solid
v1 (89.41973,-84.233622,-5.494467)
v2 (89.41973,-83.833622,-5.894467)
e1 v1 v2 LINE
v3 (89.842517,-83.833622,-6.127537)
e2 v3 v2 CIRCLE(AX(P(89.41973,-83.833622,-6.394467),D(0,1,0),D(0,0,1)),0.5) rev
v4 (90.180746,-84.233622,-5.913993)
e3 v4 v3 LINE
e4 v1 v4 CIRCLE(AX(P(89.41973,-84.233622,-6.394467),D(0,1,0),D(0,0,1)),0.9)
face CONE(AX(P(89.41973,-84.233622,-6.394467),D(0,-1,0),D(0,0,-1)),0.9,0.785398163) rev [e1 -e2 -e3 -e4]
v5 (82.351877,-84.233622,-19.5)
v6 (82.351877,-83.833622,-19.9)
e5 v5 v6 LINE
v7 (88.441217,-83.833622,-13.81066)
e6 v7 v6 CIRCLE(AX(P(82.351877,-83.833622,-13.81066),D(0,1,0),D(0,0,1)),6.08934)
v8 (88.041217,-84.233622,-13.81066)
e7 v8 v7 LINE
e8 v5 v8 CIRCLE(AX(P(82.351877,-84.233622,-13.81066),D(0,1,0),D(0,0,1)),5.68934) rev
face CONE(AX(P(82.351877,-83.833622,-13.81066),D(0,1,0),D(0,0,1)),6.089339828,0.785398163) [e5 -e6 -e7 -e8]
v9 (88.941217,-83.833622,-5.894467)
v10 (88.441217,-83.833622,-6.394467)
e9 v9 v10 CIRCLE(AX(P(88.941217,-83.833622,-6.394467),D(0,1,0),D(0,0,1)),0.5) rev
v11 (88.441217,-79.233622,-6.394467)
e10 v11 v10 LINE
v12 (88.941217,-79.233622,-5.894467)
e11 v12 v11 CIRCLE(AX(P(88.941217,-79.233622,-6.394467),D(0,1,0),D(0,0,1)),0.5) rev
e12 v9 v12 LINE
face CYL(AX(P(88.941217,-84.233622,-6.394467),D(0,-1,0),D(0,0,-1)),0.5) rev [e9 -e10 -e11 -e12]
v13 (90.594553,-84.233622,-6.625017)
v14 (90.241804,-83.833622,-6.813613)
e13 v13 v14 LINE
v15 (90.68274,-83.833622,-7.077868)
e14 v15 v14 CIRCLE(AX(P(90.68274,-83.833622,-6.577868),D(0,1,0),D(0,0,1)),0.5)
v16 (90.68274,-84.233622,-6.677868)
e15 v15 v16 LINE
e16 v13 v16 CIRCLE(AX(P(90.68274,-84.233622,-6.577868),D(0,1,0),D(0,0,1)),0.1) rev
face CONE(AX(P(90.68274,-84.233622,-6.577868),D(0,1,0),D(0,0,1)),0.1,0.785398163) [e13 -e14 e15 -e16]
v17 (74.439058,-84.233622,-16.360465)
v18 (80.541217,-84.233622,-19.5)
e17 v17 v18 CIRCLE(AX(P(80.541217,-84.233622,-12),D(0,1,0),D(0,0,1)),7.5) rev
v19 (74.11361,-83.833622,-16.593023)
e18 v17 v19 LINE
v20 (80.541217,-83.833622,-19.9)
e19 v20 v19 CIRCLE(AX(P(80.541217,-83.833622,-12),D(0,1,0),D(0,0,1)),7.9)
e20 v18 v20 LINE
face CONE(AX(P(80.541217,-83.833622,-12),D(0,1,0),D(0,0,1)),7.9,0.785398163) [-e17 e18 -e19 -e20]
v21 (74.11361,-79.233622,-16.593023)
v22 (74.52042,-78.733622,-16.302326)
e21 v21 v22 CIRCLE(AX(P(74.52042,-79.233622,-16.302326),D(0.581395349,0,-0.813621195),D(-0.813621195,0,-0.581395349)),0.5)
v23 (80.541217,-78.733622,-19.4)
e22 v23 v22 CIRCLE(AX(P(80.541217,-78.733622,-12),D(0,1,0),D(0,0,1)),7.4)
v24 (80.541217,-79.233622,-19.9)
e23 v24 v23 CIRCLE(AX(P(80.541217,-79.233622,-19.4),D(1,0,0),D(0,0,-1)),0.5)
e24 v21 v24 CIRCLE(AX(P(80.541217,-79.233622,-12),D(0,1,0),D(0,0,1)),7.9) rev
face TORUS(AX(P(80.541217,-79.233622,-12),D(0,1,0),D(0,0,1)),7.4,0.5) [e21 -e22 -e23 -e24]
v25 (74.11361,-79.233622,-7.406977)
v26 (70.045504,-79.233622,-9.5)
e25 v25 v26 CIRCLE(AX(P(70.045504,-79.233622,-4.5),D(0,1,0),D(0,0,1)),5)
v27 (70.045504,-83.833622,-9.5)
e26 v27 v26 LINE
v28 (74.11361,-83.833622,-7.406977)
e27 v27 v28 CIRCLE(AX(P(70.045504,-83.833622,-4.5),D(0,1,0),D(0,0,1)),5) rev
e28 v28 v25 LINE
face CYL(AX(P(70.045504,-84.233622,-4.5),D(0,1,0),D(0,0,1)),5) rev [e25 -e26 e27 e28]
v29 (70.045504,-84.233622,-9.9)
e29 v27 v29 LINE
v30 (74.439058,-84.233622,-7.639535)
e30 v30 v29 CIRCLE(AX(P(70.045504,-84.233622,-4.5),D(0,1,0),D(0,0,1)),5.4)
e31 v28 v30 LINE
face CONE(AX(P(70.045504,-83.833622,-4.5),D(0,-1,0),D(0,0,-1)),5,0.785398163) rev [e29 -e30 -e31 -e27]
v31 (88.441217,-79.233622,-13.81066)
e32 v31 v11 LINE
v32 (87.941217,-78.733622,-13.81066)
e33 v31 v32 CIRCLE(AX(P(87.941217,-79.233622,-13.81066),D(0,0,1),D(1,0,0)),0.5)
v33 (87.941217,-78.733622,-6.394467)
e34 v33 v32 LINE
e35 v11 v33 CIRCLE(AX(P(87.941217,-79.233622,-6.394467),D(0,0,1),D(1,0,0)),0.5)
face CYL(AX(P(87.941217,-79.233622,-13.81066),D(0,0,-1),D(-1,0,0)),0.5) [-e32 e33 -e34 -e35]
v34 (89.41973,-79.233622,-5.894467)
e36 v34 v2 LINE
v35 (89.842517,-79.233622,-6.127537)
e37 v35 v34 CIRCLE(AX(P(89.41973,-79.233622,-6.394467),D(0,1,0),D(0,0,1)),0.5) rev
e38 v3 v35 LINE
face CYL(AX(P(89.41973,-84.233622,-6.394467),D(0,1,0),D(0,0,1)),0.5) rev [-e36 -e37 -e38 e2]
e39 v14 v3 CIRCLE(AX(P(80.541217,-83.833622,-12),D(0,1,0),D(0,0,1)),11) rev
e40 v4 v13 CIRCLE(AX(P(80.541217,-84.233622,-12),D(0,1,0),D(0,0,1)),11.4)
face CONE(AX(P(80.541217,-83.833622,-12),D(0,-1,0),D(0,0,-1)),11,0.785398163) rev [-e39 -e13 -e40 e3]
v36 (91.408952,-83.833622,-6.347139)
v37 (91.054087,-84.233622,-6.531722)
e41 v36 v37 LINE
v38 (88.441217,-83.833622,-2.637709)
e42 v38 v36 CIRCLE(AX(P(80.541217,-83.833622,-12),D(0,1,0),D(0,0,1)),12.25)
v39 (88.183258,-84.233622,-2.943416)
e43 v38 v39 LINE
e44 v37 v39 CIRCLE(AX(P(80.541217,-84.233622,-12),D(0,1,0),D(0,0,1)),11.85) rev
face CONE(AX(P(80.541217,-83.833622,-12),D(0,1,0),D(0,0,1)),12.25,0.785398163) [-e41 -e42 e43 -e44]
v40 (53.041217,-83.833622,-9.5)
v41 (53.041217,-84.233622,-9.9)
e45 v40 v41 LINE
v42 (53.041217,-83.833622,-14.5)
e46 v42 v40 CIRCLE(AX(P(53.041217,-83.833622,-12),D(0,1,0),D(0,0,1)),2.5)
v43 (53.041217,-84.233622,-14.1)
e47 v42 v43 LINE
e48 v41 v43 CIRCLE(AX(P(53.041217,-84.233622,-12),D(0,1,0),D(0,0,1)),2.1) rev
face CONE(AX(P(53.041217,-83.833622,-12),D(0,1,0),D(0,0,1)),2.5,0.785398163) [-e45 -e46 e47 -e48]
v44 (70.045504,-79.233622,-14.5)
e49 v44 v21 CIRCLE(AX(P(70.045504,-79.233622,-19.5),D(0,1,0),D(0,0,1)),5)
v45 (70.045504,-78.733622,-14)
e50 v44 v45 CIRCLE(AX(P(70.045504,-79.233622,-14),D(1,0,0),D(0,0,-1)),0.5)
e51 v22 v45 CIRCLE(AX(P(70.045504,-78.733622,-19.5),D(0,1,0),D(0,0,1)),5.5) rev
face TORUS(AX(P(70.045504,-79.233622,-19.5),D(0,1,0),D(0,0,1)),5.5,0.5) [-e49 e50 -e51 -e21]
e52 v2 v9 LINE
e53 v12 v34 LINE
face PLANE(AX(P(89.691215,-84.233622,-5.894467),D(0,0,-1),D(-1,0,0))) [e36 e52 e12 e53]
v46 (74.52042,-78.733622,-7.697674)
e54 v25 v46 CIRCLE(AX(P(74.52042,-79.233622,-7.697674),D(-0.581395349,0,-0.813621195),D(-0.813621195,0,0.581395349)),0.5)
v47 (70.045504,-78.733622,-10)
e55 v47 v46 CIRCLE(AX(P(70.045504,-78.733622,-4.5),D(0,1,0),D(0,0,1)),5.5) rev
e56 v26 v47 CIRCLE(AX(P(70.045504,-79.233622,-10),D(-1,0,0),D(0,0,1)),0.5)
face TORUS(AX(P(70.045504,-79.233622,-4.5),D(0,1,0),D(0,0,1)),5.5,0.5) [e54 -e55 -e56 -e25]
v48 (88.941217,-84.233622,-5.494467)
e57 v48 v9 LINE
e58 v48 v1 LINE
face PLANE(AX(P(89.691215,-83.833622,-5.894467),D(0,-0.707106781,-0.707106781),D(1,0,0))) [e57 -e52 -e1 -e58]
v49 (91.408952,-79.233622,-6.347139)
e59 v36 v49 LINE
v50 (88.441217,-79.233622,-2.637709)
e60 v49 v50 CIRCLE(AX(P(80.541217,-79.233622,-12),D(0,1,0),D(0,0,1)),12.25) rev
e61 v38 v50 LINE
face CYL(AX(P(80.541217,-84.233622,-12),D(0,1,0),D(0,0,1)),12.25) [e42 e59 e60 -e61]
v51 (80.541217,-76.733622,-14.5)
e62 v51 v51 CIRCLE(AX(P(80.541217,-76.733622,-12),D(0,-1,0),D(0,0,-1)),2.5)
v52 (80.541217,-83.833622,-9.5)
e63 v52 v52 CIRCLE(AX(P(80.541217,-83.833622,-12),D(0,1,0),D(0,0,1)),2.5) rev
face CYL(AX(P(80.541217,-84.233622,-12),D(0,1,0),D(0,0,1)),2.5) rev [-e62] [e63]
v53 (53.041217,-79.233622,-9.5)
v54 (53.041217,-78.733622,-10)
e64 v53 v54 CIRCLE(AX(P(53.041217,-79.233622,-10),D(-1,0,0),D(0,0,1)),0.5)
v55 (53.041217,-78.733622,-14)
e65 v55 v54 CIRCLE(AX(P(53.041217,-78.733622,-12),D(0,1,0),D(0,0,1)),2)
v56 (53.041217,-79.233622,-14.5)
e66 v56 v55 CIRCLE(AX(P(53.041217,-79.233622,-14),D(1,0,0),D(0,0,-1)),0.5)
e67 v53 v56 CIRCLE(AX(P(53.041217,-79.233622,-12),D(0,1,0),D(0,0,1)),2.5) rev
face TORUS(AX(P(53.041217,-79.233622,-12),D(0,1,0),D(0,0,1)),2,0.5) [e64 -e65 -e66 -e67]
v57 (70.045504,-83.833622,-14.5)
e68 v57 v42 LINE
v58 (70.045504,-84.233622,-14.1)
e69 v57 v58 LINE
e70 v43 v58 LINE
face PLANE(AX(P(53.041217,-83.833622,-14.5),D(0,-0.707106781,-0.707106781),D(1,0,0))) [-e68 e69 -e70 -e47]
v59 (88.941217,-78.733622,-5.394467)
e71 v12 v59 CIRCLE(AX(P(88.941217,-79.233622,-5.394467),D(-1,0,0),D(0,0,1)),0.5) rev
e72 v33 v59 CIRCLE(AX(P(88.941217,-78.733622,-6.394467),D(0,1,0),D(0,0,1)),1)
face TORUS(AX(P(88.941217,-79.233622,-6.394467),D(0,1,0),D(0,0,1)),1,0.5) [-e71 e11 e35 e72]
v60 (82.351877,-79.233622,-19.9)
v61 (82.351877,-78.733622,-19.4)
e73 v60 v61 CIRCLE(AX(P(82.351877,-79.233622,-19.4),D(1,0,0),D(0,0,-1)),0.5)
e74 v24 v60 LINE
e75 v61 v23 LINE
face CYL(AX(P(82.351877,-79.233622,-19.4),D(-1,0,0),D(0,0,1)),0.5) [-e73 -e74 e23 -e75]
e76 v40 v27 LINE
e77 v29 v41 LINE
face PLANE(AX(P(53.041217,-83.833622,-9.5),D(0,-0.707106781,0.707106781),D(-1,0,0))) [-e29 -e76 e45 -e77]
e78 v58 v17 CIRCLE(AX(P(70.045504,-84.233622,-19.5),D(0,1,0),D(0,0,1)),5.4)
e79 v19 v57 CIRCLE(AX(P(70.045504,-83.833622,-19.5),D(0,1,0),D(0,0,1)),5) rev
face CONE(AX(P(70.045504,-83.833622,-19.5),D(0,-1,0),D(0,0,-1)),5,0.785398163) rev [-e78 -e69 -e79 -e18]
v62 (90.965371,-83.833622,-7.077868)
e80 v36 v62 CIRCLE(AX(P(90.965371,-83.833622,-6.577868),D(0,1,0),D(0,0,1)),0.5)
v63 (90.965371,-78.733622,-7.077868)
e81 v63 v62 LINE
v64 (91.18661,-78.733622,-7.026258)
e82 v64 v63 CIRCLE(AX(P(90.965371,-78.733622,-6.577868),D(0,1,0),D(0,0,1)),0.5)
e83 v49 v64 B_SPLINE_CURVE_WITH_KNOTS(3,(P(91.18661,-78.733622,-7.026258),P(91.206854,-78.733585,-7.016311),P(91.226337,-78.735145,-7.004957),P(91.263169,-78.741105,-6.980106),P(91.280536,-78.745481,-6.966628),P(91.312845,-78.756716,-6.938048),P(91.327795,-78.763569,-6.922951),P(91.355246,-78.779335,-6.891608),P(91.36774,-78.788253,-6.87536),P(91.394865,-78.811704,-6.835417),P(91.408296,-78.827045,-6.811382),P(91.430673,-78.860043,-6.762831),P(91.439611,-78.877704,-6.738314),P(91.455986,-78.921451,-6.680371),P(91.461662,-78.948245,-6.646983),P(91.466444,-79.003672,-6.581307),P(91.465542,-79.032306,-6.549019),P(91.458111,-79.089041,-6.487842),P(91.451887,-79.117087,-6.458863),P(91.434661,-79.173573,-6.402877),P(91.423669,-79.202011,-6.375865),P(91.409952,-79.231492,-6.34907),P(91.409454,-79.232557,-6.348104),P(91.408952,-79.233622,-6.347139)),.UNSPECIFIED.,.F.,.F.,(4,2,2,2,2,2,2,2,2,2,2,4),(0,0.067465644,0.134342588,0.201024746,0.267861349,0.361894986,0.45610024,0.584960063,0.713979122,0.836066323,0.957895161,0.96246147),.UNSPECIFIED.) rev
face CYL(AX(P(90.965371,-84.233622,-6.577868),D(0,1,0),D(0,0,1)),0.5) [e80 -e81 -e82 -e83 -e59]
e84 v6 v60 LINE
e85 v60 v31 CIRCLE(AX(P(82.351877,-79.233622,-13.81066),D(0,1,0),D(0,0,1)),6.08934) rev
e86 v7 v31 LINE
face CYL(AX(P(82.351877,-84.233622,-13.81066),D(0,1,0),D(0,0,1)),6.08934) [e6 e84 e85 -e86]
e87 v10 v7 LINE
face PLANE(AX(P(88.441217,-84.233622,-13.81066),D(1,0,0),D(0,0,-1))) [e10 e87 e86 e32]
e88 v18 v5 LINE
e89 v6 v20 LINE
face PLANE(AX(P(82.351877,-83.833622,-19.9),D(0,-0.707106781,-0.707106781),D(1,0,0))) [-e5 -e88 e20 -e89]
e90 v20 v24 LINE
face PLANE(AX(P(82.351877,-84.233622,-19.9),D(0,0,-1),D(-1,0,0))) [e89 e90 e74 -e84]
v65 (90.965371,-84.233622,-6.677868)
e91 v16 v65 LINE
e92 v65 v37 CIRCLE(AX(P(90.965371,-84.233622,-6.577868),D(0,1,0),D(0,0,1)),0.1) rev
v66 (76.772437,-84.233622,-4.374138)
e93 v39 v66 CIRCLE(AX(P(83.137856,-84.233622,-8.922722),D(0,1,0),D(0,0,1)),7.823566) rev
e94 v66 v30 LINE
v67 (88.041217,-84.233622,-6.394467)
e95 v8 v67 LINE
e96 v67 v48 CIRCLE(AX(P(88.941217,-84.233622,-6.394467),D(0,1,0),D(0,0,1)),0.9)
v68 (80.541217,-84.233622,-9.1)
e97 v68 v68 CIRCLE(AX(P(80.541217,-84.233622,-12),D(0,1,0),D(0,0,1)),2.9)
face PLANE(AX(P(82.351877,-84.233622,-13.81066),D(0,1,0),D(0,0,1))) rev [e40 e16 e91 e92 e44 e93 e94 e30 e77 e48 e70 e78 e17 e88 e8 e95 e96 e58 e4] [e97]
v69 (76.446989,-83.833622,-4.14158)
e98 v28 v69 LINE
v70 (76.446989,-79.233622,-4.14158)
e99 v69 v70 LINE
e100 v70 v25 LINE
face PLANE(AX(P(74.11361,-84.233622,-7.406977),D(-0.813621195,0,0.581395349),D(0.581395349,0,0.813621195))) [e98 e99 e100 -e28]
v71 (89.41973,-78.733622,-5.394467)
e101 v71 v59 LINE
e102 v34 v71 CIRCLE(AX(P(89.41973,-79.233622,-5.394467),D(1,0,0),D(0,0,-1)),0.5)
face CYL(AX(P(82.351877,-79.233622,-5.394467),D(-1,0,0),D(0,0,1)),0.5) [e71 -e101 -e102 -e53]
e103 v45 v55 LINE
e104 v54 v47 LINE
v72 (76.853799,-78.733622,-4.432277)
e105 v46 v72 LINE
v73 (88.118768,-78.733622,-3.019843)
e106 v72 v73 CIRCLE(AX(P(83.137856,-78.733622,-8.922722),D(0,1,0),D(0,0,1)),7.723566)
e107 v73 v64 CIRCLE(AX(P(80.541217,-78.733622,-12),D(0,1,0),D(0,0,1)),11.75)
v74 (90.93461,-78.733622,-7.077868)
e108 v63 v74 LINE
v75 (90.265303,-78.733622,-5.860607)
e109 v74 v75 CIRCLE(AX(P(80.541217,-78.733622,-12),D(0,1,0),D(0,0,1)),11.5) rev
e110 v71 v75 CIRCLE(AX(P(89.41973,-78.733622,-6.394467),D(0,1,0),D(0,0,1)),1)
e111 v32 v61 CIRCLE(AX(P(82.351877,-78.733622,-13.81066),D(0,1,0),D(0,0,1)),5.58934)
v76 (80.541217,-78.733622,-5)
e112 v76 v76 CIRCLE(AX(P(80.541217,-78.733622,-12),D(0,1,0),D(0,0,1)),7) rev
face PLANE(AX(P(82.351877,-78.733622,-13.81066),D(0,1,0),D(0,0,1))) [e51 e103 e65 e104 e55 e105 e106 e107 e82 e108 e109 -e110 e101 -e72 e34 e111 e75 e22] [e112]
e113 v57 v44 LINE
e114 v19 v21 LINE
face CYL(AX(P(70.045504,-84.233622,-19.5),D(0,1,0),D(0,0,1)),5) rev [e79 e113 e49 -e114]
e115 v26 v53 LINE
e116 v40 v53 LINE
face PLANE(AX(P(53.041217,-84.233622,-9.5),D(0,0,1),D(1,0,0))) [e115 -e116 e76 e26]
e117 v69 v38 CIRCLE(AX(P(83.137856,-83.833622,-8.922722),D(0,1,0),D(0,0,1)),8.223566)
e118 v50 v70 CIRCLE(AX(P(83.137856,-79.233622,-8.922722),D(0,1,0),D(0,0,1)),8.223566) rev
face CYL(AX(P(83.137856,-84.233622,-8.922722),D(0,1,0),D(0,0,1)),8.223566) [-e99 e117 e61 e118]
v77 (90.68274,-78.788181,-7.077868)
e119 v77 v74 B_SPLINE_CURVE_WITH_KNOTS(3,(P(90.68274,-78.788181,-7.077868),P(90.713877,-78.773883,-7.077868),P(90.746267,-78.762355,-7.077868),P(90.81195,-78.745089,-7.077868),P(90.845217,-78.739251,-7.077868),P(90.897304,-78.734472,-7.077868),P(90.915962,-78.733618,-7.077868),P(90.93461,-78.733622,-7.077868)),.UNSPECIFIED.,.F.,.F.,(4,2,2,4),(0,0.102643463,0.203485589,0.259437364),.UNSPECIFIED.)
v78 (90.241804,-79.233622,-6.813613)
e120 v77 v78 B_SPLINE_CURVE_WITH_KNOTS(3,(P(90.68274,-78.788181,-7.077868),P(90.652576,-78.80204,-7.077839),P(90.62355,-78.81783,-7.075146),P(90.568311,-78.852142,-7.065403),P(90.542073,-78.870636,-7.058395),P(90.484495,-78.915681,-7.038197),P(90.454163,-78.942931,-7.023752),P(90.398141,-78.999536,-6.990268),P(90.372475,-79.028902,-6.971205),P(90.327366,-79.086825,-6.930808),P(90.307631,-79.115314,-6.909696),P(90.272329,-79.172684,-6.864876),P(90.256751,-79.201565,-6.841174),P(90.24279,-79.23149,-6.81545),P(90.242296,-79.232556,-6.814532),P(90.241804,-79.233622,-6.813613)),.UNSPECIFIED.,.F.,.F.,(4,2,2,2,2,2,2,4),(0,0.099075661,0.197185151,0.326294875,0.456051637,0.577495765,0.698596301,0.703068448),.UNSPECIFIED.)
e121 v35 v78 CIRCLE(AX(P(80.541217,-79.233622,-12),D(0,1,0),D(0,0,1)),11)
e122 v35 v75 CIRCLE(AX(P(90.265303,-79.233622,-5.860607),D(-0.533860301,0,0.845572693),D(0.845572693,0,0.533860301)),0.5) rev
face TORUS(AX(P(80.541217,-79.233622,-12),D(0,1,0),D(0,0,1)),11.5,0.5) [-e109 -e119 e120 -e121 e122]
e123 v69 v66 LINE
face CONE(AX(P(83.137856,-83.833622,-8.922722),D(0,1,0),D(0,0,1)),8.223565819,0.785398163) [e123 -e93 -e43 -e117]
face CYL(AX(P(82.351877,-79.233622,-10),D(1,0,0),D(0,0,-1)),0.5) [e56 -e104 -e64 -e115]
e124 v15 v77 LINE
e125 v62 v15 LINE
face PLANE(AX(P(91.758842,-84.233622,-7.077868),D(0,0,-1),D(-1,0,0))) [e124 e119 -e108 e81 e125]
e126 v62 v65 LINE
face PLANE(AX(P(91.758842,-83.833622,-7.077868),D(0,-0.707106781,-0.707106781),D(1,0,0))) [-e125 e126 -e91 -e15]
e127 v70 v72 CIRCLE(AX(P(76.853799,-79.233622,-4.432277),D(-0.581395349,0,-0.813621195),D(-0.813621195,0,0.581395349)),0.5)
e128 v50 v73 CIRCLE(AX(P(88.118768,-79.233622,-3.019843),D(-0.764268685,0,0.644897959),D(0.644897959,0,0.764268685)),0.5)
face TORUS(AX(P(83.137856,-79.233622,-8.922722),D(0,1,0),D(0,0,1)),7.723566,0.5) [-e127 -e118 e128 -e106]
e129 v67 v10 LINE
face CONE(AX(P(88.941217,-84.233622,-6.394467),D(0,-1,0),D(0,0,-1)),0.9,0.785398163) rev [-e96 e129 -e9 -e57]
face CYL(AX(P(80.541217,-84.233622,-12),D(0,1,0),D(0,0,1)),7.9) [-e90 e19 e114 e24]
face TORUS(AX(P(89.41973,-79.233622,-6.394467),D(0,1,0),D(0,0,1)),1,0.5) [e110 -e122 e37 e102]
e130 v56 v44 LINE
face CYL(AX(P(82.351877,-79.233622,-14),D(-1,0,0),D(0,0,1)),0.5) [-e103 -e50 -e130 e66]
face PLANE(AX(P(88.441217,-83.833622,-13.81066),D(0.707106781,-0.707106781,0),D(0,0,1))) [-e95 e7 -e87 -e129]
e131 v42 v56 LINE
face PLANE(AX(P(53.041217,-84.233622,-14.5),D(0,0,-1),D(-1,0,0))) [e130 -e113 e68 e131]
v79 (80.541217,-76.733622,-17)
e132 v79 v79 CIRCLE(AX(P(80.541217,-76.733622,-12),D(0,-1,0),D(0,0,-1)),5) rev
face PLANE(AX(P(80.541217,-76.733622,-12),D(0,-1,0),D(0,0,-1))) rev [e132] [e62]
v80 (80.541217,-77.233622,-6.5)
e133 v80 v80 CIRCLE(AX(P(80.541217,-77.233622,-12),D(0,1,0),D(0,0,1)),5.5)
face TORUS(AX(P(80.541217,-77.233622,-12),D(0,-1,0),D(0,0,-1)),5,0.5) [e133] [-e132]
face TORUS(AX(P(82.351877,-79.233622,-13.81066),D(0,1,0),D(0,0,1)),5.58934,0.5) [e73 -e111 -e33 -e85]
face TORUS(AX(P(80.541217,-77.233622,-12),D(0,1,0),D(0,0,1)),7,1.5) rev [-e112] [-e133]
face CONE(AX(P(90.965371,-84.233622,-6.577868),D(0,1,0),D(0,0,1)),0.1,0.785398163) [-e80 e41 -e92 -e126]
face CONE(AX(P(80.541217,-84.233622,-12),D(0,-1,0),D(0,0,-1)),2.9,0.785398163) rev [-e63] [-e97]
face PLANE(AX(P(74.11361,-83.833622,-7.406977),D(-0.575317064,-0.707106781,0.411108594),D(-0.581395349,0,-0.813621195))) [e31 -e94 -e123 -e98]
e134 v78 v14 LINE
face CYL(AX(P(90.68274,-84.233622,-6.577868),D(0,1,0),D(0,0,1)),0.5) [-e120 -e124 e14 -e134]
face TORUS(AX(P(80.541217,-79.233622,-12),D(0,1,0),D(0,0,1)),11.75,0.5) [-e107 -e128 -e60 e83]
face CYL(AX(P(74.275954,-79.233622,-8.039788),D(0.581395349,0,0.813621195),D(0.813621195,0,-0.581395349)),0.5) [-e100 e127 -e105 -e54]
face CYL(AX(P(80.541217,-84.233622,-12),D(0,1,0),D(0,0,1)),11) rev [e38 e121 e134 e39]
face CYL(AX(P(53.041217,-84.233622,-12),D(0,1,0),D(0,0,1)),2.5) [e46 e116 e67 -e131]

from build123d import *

# Parameters (mm, degrees)
BOSS_EXTRUDE1_START = -2
SKETCH1_R           = 2.5
BOSS_EXTRUDE1_DEPTH = 5.5
BOSS_EXTRUDE2_REACH = 96.191
SKETCH2_R           = 5.5
SKETCH2_R_2         = 2.5
FILLET1_R           = 1.5
FILLET2_R           = 0.5
CHAMFER1_SIZE       = 0.4


with BuildPart() as part:
    # Sketch1 → Boss-Extrude1 (new body)
    with BuildSketch(Plane(origin=(0, -76.733621845, 0), x_dir=(1, 0, 0), z_dir=(0, 1, 0)).offset(BOSS_EXTRUDE1_START)):
        with BuildLine():
            Line((53.041217068, 9.5), (70.045503657, 9.5))
            ThreePointArc((70.045503657, 9.5), (72.332982212, 8.946059138), (74.11360963, 7.406976744))
            Line((74.11360963, 7.406976744), (76.446988808, 4.141579527))
            ThreePointArc((76.446988808, 4.141579527), (82.114772389, 0.763045112), (88.441217068, 2.637708614))
            ThreePointArc((88.441217068, 2.637708614), (90.354455743, 4.667684765), (91.758842367, 7.07786808))
            Line((91.758842367, 7.07786808), (90.378524492, 7.07786808))
            ThreePointArc((90.378524492, 7.07786808), (90.053291089, 6.475468544), (89.691215146, 5.89446684))
            Line((89.691215146, 5.89446684), (88.441217068, 5.89446684))
            Line((88.441217068, 5.89446684), (88.441217068, 12))
            Line((88.441217068, 12), (88.441217068, 13.810660172))
            ThreePointArc((88.441217068, 13.810660172), (86.657690725, 18.116473657), (82.35187724, 19.9))
            Line((82.35187724, 19.9), (80.541217068, 19.9))
            ThreePointArc((80.541217068, 19.9), (76.927000951, 19.024773438), (74.11360963, 16.593023256))
            ThreePointArc((74.11360963, 16.593023256), (72.332982212, 15.053940862), (70.045503657, 14.5))
            Line((70.045503657, 14.5), (53.041217068, 14.5))
            ThreePointArc((53.041217068, 14.5), (50.541217068, 12), (53.041217068, 9.5))
        make_face()
        with Locations(Location((80.541217068, 12, 0), (0, 0, 270))):
            Circle(SKETCH1_R, mode=Mode.SUBTRACT)
    extrude(amount=-BOSS_EXTRUDE1_DEPTH)

    # Sketch2 → Boss-Extrude2 (add, up to next)
    with BuildSketch(Plane(origin=(0, -76.733621845, 0), x_dir=(-1, 0, 0), z_dir=(0, -1, 0)), mode=Mode.PRIVATE) as boss_extrude2_sk1:
        with Locations(Location((-80.541217068, 12, 0), (0, 0, 270))):
            Circle(SKETCH2_R)
        with Locations(Location((-80.541217068, 12, 0), (0, 0, 270))):
            Circle(SKETCH2_R_2, mode=Mode.SUBTRACT)
    boss_extrude2_tool1 = extrude(boss_extrude2_sk1.sketch, amount=BOSS_EXTRUDE2_REACH, mode=Mode.PRIVATE) - part.part
    add(boss_extrude2_tool1.solids().sort_by_distance((80.541217, -76.733622, -17.344437))[0])

    # Fillet1
    fillet1_edges = [part.edges().sort_by_distance(p)[0] for p in [
        (80.541217068, -78.733621845, -17.5),
    ]]
    fillet(fillet1_edges, radius=FILLET1_R)

    # Fillet2
    fillet2_edges = [part.edges().sort_by_distance(p)[0] for p in [
        (89.066216107, -78.733621845, -5.89446684),
        (90.053291089, -78.733621845, -6.475468544),
        (90.354455743, -78.733621845, -4.667684765),
        (82.114772389, -78.733621845, -0.763045112),
        (75.280299219, -78.733621845, -5.774278136),
        (72.332982212, -78.733621845, -8.946059138),
        (61.543360362, -78.733621845, -9.5),
        (50.541217068, -78.733621845, -12),
        (61.543360362, -78.733621845, -14.5),
        (72.332982212, -78.733621845, -15.053940862),
        (76.927000951, -78.733621845, -19.024773438),
        (81.446547154, -78.733621845, -19.9),
        (86.657690725, -78.733621845, -18.116473657),
        (88.441217068, -78.733621845, -9.852563506),
        (88.441217068, -81.483621845, -5.89446684),
        (89.691215146, -81.483621845, -5.89446684),
        (90.378524492, -81.483621845, -7.07786808),
        (91.758842367, -81.483621845, -7.07786808),
        (80.541217068, -76.733621845, -17.5),
    ]]
    fillet(fillet2_edges, radius=FILLET2_R - 0.0001)  # a hair under: the kernel refuses the full size

    # Chamfer1
    chamfer1_edges = [part.edges().sort_by_distance(p)[0] for p in [
        (86.657690725, -84.233621845, -18.116473657),
        (81.446547154, -84.233621845, -19.9),
        (76.927000951, -84.233621845, -19.024773438),
        (72.332982212, -84.233621845, -15.053940862),
        (61.543360362, -84.233621845, -14.5),
        (50.541217068, -84.233621845, -12),
        (61.543360362, -84.233621845, -9.5),
        (80.541217068, -84.233621845, -14.5),
        (72.332982212, -84.233621845, -8.946059138),
        (75.280299219, -84.233621845, -5.774278136),
        (82.114772389, -84.233621845, -0.763045112),
        (90.106673865, -84.233621845, -4.347253026),
        (90.0483511, -84.233621845, -6.46697167),
        (90.824107859, -84.233621845, -7.07786808),
        (89.180451269, -84.233621845, -5.89446684),
        (88.441217068, -84.233621845, -10.102513506),
        (90.425701502, -84.233621845, -7.006759492),
        (91.39286189, -84.233621845, -6.837375819),
        (89.661122586, -84.233621845, -5.95658104),
        (88.587634388, -84.233621845, -6.04088416),
    ]]
    chamfer(chamfer1_edges, length=CHAMFER1_SIZE)


solid = part.part
